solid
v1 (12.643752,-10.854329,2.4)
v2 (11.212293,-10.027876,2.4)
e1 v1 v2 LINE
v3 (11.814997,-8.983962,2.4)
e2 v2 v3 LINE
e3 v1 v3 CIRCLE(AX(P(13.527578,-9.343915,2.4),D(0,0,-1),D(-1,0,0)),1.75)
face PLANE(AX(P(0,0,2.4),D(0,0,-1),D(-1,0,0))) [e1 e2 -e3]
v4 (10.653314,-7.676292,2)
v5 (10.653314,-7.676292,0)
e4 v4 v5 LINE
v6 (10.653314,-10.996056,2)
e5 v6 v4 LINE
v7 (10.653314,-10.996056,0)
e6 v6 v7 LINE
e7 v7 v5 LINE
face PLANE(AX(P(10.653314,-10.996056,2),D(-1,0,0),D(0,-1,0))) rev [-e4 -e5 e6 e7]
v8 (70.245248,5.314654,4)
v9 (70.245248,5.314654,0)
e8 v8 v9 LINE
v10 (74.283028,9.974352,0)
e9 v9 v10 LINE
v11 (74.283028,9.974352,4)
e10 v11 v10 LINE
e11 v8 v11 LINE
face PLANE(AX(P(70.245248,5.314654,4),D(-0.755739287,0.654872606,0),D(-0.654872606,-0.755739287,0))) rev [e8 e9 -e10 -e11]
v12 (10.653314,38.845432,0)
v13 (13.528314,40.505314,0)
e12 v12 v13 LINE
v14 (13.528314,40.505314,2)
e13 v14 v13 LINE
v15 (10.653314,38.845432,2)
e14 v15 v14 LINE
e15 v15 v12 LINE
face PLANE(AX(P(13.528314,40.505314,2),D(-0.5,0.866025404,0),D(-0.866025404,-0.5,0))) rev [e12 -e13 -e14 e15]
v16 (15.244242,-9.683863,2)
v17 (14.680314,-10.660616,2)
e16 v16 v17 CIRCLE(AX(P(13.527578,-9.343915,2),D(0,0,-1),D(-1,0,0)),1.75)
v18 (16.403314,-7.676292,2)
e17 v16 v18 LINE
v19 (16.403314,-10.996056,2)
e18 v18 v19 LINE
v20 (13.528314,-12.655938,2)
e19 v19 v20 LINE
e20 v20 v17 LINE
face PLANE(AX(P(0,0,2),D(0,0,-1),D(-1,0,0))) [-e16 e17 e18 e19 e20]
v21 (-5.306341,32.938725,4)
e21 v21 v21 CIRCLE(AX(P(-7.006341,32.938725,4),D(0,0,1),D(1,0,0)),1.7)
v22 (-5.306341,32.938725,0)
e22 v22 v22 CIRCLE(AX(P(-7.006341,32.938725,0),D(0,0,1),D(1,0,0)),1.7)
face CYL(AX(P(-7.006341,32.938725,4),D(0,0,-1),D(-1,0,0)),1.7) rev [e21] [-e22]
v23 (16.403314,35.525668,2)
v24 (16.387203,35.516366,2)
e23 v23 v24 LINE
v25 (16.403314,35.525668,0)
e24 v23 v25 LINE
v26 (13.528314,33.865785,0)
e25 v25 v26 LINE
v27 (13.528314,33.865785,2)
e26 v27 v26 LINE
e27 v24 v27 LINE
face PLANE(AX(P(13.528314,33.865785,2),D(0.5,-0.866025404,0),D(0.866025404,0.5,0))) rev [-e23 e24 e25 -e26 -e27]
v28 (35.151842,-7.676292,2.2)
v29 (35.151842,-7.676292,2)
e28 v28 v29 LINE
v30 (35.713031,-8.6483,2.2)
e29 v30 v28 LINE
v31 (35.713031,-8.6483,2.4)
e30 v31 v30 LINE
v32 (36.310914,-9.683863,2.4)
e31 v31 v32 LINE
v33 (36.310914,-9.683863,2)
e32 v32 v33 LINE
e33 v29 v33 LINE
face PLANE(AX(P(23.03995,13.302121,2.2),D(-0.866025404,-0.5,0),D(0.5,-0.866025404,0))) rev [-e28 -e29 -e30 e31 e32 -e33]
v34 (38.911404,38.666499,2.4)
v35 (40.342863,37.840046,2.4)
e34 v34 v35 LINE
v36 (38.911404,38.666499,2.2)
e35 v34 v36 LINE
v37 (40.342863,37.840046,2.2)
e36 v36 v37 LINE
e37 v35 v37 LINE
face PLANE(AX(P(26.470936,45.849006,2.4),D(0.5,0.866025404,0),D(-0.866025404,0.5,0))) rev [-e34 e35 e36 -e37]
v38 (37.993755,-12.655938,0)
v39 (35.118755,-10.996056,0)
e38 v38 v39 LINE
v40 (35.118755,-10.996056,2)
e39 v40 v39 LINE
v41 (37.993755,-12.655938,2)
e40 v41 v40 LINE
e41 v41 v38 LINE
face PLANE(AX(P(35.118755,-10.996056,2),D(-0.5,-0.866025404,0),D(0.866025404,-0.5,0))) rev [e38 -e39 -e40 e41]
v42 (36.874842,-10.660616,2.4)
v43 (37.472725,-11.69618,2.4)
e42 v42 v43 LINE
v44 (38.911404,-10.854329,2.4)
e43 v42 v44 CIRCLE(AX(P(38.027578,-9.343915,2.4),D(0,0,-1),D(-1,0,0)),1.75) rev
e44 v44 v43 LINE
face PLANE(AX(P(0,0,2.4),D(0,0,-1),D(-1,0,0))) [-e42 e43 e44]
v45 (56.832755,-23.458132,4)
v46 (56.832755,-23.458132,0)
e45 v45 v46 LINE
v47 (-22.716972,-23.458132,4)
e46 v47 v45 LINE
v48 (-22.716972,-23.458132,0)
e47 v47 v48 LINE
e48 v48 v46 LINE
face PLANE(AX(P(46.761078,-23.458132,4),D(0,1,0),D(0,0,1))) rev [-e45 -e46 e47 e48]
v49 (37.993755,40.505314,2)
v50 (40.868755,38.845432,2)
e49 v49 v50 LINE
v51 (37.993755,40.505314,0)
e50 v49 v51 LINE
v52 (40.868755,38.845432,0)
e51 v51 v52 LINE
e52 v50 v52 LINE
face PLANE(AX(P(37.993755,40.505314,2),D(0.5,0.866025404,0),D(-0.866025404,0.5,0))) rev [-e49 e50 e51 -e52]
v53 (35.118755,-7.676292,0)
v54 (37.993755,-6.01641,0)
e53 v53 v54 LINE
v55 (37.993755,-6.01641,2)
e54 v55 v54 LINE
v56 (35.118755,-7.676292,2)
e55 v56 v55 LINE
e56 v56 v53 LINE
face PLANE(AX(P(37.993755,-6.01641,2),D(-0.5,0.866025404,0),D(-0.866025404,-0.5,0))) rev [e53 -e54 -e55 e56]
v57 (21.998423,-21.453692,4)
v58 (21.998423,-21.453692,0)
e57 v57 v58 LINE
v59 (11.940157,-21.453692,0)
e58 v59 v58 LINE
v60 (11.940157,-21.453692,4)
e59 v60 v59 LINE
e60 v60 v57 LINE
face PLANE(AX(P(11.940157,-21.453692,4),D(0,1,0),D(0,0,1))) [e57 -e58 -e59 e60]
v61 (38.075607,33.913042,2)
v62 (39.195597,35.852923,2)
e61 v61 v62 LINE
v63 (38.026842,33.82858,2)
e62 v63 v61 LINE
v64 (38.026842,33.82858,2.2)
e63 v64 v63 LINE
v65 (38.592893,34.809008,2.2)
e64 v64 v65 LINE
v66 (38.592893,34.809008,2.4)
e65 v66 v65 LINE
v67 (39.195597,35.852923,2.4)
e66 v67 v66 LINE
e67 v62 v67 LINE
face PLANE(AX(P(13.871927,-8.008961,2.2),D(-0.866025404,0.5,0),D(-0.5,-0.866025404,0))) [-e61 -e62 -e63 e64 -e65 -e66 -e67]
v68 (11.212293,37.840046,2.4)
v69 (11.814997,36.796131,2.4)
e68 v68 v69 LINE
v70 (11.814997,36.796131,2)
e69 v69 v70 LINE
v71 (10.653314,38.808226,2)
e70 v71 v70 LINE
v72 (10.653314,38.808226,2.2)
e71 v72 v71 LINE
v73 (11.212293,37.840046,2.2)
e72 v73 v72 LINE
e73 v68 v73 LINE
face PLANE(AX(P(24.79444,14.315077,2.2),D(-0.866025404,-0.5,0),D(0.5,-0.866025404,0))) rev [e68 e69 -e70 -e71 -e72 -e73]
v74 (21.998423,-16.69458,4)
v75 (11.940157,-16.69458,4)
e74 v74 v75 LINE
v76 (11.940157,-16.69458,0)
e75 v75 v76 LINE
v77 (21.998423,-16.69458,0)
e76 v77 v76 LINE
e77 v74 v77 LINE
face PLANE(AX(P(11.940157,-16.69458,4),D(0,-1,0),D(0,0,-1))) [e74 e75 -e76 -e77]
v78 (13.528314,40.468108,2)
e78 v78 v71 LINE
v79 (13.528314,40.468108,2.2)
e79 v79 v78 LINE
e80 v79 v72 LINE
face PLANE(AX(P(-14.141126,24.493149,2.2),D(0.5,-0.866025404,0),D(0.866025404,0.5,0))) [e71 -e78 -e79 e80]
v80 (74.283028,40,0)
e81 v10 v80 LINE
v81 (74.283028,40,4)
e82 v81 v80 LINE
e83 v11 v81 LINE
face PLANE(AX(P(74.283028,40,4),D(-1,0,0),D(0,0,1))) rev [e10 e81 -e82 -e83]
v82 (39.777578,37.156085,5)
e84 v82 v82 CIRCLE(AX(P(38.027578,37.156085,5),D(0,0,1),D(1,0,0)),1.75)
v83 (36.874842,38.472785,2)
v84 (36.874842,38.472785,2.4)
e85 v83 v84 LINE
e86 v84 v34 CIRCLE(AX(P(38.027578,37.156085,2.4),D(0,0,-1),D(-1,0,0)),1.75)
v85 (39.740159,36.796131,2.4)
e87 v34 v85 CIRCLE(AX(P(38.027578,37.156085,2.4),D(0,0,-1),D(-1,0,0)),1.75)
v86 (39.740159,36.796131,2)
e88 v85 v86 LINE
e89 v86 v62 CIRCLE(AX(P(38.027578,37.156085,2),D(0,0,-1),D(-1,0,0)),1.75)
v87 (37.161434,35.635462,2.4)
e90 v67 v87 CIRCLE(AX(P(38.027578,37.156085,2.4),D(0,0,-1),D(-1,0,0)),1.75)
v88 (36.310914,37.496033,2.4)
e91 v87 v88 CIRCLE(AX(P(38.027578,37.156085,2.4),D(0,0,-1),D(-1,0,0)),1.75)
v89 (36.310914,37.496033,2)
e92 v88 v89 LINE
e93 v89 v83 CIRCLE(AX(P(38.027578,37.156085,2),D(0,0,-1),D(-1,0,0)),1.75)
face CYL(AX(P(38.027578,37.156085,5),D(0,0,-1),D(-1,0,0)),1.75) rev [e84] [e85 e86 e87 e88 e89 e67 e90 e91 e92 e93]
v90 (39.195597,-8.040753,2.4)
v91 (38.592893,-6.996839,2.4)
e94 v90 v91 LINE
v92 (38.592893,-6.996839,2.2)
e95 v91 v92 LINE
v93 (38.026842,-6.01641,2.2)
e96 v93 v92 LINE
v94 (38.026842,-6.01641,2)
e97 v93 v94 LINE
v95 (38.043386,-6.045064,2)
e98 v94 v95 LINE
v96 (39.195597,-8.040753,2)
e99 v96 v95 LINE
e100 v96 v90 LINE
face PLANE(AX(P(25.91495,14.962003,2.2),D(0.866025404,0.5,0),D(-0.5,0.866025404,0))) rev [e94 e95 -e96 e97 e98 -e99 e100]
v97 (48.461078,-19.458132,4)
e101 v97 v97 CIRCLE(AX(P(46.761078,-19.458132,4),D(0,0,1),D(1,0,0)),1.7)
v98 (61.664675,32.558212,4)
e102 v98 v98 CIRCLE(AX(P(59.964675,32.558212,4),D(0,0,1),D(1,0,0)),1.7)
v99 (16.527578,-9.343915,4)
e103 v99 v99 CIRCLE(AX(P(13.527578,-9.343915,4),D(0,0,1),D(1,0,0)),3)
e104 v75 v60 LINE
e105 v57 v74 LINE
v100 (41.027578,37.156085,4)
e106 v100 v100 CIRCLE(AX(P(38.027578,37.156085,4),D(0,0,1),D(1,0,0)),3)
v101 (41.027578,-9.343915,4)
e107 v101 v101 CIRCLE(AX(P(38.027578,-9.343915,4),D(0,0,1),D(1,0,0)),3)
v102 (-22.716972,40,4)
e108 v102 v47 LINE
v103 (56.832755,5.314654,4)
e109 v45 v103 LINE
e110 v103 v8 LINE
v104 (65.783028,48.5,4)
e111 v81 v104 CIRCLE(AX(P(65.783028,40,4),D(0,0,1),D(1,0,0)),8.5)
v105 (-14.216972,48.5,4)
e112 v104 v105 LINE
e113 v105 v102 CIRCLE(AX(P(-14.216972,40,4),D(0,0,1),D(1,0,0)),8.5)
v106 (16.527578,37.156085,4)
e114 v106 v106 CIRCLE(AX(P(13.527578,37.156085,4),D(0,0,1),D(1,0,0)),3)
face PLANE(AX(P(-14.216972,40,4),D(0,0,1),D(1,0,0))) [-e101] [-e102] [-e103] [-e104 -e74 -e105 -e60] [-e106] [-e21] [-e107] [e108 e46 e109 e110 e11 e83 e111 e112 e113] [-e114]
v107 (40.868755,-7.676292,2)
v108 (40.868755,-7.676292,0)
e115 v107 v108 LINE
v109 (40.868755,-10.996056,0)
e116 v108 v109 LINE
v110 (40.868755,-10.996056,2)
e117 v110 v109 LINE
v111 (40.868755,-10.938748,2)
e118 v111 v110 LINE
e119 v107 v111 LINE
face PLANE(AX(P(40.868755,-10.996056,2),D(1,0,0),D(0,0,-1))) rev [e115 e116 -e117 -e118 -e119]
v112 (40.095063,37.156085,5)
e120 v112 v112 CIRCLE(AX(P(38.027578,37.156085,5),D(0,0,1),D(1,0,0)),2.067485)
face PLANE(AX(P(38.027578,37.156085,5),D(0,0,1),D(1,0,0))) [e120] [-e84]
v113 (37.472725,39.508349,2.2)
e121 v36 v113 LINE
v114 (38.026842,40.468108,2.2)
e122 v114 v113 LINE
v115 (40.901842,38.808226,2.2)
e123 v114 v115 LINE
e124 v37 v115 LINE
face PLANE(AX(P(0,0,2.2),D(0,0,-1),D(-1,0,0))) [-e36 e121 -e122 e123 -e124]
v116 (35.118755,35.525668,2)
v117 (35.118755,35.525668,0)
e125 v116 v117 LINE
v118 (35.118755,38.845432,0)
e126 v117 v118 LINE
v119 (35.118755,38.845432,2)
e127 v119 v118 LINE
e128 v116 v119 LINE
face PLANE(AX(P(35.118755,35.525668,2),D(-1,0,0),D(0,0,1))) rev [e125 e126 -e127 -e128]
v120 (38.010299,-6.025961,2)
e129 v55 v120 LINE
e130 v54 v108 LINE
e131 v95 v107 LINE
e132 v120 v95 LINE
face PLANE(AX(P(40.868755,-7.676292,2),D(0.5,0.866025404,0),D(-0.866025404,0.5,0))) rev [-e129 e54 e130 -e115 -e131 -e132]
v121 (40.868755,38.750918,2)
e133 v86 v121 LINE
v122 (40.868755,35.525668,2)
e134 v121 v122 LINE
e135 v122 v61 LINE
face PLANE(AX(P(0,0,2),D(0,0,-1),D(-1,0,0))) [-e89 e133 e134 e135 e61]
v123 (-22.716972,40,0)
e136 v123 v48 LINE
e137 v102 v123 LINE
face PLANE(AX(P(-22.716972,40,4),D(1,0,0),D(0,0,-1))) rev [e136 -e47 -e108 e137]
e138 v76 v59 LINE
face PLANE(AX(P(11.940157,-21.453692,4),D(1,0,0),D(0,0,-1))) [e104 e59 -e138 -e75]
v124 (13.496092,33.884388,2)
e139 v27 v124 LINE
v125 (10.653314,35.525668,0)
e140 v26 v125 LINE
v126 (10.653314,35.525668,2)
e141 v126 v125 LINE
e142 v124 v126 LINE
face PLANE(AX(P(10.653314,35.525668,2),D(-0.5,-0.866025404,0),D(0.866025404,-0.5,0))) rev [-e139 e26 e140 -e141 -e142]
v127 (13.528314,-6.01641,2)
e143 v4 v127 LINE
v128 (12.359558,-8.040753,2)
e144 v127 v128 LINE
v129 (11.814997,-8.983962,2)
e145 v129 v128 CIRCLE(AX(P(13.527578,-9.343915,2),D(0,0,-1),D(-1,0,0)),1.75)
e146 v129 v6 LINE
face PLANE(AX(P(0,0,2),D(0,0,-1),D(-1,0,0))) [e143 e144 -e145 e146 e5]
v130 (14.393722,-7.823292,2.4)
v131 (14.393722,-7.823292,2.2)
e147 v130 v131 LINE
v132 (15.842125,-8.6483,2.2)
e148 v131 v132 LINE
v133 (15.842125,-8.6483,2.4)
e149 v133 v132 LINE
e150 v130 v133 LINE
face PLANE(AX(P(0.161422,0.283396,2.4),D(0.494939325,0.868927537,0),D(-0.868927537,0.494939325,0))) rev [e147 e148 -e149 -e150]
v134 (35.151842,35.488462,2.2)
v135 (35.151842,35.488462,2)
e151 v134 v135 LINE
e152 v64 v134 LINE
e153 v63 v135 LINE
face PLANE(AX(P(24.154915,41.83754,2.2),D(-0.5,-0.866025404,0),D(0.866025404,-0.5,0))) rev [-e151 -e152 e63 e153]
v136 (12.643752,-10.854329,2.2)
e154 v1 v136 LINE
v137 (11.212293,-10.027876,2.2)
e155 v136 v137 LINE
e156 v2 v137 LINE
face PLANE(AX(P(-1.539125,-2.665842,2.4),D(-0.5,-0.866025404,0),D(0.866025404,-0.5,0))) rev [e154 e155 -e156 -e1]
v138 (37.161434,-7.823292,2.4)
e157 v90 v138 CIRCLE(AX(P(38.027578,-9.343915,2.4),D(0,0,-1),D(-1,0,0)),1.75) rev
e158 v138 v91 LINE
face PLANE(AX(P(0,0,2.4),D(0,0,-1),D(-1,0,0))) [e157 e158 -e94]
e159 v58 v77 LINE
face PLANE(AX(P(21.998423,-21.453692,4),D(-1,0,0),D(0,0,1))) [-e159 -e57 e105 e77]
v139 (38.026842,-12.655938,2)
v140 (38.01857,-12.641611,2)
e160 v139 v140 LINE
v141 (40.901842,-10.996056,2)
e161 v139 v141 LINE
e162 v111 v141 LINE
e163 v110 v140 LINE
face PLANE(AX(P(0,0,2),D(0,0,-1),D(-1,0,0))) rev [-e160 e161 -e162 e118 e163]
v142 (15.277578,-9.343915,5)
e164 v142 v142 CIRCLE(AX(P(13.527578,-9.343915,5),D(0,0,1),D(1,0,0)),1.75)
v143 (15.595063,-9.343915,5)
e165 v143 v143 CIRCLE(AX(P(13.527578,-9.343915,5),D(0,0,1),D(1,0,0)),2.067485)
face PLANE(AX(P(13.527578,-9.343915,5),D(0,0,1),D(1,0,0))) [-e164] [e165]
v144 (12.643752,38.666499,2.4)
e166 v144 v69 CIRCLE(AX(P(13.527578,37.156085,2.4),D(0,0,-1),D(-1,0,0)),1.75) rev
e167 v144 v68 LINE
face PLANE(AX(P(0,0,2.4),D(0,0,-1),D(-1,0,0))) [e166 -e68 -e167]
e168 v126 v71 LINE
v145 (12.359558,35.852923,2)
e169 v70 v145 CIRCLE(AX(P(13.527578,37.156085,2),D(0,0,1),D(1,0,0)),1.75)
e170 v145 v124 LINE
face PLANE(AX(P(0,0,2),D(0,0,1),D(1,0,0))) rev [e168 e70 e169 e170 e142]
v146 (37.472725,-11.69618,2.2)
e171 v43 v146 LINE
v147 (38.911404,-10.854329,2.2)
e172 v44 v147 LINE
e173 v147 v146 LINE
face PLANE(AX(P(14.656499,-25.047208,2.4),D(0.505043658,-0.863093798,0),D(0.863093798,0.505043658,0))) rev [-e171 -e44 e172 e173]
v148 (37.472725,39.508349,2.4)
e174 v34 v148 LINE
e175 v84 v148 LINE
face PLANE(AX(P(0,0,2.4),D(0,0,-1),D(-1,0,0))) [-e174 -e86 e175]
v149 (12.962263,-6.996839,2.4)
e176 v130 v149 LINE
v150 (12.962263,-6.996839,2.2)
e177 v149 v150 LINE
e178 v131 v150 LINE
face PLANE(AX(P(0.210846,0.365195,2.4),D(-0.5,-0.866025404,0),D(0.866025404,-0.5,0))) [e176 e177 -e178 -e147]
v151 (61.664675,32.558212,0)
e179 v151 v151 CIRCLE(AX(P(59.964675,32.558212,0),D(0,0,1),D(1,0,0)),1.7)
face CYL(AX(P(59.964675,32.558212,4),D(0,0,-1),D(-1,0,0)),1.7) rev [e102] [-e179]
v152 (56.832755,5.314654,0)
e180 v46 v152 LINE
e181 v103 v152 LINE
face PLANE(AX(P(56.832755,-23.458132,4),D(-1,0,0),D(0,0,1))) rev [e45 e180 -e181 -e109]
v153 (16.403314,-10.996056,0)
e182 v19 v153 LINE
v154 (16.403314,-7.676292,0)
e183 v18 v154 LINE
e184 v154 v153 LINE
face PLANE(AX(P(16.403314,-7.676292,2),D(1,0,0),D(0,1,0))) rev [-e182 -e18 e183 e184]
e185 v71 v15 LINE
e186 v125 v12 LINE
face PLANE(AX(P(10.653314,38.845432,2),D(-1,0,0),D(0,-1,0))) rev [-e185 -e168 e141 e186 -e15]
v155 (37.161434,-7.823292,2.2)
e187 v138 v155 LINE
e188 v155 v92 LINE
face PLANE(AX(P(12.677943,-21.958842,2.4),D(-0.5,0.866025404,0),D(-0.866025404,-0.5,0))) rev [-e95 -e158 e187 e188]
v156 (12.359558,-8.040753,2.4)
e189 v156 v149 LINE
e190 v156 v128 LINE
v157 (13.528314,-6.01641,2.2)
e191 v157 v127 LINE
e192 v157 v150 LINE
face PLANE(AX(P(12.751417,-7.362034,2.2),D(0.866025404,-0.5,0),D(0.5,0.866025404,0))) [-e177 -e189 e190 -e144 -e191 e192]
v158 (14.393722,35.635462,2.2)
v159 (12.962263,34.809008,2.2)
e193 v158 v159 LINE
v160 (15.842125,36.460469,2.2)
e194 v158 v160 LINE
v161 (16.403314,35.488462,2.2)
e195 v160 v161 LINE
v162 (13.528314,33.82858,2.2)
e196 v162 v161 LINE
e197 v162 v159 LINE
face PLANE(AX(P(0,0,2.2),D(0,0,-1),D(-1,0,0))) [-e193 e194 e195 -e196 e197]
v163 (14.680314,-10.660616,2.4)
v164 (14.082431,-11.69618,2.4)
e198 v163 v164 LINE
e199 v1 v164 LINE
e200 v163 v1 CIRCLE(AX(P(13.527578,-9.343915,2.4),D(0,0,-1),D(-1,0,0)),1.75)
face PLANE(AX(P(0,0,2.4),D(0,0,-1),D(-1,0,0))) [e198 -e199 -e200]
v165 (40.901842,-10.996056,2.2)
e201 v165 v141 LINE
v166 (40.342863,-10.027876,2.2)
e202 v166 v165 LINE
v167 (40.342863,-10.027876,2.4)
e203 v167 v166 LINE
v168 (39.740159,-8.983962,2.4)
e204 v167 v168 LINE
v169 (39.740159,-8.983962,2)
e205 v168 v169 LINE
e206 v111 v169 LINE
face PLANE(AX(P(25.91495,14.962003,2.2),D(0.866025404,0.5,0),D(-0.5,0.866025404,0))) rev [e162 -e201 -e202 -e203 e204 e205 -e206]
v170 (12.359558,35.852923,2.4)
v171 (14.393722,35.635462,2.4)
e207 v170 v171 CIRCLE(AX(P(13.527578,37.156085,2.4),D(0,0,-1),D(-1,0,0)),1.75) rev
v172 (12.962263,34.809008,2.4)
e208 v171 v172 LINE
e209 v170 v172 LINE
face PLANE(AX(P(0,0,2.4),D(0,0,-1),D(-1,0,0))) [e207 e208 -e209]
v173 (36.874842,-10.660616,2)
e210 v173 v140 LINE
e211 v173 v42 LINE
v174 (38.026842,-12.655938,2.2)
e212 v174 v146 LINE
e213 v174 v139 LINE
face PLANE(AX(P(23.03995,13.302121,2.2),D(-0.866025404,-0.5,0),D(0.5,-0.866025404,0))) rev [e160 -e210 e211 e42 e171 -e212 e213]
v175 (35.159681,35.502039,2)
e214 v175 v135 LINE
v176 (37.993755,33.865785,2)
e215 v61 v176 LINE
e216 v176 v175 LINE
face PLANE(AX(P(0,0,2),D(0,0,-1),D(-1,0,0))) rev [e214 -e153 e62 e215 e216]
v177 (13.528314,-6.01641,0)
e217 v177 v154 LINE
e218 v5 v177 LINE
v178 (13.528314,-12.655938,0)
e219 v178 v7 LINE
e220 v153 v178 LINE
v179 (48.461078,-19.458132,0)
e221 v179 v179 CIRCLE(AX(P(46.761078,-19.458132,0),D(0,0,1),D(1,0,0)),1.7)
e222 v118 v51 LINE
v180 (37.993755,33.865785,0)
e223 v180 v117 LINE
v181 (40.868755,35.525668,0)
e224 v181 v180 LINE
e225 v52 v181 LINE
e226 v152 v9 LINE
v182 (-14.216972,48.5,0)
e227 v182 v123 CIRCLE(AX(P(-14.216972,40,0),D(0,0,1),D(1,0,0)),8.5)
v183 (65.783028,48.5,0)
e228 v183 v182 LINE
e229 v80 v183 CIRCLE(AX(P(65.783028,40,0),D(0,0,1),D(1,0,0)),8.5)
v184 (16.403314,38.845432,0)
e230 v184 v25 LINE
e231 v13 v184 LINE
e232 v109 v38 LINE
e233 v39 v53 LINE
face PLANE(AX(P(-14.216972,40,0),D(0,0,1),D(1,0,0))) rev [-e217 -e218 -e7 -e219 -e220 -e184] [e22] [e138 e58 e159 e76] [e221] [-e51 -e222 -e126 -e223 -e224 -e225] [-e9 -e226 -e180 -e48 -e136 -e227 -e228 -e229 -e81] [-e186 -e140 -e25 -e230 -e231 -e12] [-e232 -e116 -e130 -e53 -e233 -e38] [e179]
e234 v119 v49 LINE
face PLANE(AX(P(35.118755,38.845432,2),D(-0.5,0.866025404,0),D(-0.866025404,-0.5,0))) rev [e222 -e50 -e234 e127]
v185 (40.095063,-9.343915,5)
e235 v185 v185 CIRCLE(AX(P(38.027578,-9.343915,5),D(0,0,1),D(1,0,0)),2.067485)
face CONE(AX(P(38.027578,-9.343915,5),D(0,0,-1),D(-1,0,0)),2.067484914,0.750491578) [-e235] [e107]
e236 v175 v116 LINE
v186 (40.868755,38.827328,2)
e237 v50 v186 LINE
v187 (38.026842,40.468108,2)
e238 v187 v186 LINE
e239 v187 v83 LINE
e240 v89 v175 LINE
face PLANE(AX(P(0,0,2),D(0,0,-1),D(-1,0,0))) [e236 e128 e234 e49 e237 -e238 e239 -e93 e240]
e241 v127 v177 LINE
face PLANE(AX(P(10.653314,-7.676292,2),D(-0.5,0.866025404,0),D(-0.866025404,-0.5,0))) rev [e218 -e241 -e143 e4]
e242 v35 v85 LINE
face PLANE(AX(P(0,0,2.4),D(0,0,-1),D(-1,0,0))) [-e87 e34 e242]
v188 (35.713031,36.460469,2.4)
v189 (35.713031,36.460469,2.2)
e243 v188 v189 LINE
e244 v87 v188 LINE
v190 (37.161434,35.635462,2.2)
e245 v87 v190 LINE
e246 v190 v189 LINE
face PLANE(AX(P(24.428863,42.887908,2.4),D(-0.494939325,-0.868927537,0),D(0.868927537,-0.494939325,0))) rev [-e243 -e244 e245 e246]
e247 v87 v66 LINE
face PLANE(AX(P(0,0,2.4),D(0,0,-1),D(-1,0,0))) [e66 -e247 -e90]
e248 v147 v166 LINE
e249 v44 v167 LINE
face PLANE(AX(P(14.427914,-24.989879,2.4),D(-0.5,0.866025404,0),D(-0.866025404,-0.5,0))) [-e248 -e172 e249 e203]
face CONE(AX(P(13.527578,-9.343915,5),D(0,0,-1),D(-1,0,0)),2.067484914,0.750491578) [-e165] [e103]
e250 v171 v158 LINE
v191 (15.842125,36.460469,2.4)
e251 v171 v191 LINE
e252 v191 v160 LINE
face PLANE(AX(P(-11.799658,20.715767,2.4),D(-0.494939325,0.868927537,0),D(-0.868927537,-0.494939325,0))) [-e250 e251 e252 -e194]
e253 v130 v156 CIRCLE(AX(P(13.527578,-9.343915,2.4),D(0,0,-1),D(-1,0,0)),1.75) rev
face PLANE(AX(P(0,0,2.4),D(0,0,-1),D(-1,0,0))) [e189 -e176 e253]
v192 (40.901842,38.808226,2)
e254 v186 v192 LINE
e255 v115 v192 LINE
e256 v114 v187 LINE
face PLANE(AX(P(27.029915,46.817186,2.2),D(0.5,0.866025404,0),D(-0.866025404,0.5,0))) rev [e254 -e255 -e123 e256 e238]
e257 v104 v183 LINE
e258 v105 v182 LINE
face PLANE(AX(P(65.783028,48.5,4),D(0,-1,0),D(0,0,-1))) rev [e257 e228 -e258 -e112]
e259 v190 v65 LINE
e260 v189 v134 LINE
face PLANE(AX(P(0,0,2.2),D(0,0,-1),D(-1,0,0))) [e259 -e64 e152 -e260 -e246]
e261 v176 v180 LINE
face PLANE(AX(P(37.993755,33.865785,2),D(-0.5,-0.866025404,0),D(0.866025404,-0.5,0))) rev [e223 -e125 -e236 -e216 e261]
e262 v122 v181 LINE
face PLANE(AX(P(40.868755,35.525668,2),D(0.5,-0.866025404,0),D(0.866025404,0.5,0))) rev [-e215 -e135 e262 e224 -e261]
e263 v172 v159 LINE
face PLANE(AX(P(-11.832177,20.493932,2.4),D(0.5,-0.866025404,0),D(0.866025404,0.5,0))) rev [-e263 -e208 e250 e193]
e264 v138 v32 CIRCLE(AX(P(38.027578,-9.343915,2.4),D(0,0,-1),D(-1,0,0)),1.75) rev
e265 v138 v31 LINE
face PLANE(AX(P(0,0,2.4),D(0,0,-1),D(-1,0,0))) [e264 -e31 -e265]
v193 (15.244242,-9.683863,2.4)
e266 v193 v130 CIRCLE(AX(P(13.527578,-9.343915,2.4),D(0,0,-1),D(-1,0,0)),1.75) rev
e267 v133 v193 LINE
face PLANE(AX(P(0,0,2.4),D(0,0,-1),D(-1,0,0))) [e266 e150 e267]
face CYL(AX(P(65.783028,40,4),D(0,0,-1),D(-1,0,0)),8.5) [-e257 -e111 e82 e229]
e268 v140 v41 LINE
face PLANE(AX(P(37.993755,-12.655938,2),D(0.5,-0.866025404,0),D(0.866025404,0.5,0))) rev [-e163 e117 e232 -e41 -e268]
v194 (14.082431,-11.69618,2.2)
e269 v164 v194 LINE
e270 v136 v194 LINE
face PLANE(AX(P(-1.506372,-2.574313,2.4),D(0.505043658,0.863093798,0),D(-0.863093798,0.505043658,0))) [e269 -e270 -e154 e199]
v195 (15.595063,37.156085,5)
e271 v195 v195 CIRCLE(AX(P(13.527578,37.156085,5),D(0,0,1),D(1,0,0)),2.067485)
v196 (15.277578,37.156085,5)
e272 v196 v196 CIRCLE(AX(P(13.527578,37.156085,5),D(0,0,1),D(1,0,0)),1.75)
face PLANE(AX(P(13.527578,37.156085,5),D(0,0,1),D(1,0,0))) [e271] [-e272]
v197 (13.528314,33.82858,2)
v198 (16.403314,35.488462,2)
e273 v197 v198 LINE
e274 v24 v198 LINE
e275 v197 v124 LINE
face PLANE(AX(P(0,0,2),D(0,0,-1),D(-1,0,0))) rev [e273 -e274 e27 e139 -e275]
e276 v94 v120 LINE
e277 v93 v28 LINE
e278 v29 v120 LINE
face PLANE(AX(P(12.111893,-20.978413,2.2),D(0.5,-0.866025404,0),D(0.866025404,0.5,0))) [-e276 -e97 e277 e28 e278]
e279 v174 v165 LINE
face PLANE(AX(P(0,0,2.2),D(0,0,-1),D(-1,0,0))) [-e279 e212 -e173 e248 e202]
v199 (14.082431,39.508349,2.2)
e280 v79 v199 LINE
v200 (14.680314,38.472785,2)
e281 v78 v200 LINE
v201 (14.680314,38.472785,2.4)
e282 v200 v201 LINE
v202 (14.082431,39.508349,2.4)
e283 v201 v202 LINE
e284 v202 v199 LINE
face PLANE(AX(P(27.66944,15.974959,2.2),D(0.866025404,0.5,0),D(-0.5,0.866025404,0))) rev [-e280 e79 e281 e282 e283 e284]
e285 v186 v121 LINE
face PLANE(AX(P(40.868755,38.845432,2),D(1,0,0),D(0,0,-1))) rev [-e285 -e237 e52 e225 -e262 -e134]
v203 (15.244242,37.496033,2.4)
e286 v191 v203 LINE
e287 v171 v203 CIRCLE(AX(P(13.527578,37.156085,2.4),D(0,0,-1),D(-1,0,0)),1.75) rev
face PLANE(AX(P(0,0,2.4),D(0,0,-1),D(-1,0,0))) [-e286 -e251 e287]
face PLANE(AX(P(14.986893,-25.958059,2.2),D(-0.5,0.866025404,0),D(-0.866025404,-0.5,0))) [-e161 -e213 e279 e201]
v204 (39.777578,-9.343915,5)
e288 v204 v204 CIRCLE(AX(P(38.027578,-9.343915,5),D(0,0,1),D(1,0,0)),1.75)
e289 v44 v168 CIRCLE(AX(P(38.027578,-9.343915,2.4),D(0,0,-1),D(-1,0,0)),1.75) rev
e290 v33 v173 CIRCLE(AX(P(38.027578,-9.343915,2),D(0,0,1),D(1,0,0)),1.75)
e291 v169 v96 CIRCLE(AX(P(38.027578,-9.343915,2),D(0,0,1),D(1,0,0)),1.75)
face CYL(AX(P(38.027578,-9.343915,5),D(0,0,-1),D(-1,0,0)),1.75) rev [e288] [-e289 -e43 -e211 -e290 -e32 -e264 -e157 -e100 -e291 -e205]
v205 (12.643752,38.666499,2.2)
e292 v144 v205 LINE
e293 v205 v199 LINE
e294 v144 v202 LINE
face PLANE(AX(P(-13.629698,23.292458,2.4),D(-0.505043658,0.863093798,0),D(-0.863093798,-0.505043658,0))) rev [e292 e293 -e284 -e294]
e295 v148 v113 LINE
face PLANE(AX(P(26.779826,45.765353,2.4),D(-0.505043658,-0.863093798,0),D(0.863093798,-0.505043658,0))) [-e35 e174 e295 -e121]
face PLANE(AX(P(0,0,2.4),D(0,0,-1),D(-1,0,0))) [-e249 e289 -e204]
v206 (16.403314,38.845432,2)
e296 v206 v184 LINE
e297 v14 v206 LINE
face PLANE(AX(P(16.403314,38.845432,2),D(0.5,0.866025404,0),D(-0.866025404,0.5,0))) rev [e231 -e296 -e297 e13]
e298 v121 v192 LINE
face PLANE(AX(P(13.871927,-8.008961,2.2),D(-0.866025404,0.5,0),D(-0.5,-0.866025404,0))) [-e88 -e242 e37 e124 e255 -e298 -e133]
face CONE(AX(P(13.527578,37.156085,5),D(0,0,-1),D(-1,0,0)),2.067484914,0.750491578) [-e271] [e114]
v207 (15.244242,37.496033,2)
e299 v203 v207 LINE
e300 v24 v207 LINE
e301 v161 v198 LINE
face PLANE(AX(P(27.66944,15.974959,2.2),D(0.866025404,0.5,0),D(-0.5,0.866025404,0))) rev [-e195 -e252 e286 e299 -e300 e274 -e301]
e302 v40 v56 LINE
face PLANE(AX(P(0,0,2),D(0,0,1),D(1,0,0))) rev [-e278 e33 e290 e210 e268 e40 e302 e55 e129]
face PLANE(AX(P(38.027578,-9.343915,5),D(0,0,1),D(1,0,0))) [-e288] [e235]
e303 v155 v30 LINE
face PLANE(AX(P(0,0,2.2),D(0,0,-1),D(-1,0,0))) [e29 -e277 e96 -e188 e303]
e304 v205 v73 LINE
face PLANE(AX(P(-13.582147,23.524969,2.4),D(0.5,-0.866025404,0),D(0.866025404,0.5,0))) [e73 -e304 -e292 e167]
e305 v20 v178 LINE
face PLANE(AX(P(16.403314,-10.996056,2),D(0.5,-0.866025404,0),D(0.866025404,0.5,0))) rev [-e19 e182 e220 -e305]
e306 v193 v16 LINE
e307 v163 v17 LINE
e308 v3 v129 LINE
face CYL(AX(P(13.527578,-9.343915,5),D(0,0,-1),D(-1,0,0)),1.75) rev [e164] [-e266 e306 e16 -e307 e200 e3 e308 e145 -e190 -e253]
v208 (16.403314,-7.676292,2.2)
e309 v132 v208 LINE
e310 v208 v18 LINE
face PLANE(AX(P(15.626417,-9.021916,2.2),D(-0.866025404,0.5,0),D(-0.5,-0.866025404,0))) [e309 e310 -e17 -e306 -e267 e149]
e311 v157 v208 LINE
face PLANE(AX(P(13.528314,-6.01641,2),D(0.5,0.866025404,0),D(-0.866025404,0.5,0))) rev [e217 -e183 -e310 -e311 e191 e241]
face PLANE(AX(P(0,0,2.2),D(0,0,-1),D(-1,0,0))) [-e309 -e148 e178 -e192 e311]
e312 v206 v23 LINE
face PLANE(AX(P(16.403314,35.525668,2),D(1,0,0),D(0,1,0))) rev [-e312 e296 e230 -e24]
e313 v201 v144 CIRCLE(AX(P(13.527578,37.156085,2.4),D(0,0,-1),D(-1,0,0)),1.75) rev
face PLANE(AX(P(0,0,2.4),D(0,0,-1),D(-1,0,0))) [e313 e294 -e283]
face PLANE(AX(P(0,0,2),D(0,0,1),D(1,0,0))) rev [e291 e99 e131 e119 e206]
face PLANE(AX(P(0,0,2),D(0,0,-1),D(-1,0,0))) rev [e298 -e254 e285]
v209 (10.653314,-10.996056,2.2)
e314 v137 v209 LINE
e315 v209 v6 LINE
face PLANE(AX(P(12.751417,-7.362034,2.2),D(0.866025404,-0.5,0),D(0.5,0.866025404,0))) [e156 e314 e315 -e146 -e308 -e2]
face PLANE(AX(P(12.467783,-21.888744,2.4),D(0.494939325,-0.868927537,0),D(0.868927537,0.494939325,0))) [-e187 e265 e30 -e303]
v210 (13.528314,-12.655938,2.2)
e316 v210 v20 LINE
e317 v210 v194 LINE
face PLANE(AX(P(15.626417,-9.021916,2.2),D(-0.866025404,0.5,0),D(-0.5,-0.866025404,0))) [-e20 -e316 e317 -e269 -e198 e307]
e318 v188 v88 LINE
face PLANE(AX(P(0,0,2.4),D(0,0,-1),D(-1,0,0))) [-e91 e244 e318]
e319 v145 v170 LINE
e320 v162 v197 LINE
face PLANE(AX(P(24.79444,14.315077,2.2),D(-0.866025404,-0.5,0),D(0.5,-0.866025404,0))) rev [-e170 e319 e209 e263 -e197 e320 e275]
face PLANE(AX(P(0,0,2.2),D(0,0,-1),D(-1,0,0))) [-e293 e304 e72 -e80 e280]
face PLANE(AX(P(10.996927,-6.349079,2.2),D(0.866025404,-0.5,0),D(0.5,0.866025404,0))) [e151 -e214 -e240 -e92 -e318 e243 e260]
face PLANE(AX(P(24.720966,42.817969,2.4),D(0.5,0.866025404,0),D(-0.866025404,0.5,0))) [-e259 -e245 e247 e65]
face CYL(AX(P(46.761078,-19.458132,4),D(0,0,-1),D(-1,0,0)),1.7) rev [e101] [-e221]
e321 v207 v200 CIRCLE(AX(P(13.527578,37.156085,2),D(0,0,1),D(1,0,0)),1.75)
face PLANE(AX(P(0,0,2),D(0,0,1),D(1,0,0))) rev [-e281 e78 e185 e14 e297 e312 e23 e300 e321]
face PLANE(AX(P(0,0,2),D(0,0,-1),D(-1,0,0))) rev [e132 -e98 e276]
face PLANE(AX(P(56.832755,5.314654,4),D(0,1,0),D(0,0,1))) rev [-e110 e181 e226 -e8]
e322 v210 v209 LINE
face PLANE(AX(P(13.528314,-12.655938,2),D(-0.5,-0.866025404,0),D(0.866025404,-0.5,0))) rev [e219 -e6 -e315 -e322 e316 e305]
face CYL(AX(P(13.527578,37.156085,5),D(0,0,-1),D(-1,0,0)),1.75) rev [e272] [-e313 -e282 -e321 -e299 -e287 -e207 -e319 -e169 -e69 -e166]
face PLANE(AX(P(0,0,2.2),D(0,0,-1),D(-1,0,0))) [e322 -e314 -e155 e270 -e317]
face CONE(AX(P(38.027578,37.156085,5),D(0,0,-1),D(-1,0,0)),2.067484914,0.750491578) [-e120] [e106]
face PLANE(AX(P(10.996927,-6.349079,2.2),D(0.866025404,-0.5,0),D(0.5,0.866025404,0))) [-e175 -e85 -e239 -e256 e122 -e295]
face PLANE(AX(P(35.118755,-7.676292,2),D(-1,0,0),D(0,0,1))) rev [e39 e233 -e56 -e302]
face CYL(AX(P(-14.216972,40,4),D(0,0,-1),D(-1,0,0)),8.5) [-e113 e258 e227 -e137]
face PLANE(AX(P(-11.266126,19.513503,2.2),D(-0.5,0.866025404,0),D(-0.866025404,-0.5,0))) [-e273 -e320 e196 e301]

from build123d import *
from OCP.BRepFilletAPI import BRepFilletAPI_MakeChamfer

# Parameters (mm, degrees)
CROQUIS1_R              = 1.7
CROQUIS1_W              = 10.058265445
CROQUIS1_H              = 4.759112173
SALIENTE_EXTRUIR1_DEPTH = 4
CROQUIS2_R              = 3
CROQUIS2_R_2            = 1.75
SALIENTE_EXTRUIR2_DEPTH = 1
CHAFL_N1_SIZE           = 1
CHAFL_N1_SIZE_2         = 0.932515086
CORTAR_EXTRUIR1_START   = -6
CROQUIS3_R              = 1.75
CORTAR_EXTRUIR1_DEPTH   = 6
CORTAR_EXTRUIR2_DEPTH   = 2
CORTAR_EXTRUIR3_DEPTH   = 0.2
CORTAR_EXTRUIR4_DEPTH   = 0.2


with BuildPart() as part:
    # Croquis1 → Saliente-Extruir1 (new body)
    with BuildSketch(Plane.XY):
        with BuildLine():
            Line((46.761077919, -23.458131852), (56.832754836, -23.458131852))
            Line((56.832754836, -23.458131852), (56.832754836, 5.314653818))
            Line((56.832754836, 5.314653818), (70.245248308, 5.314653818))
            Line((70.245248308, 5.314653818), (74.283027827, 9.974351882))
            Line((74.283027827, 9.974351882), (74.283027827, 40))
            ThreePointArc((74.283027827, 40), (71.793435467, 46.01040764), (65.783027827, 48.5))
            Line((65.783027827, 48.5), (-14.216972173, 48.5))
            ThreePointArc((-14.216972173, 48.5), (-20.227379813, 46.01040764), (-22.716972173, 40))
            Line((-22.716972173, 40), (-22.716972173, -23.458131852))
            Line((-22.716972173, -23.458131852), (46.761077919, -23.458131852))
        make_face()
        with Locations((46.761077919, -19.458131852)):
            Circle(CROQUIS1_R, mode=Mode.SUBTRACT)
        with Locations((-7.00634082, 32.938725209)):
            Circle(CROQUIS1_R, mode=Mode.SUBTRACT)
        with Locations((59.964675143, 32.558212342)):
            Circle(CROQUIS1_R, mode=Mode.SUBTRACT)
        with Locations((16.969290087, -19.074136319)):
            Rectangle(CROQUIS1_W, CROQUIS1_H, mode=Mode.SUBTRACT)
    extrude(amount=SALIENTE_EXTRUIR1_DEPTH)

    # Croquis2 → Saliente-Extruir2 (add)
    # profile 1 of 4: a face of its own
    with BuildSketch(Plane.XY.offset(4)):
        with Locations((13.527577906, 37.15608476)):
            Circle(CROQUIS2_R)
        with Locations((13.527577906, 37.15608476)):
            Circle(CROQUIS2_R_2, mode=Mode.SUBTRACT)
    # profile 2 of 4: a face of its own
    with BuildSketch(Plane.XY.offset(4)):
        with Locations((38.027577906, 37.15608476)):
            Circle(CROQUIS2_R)
        with Locations((38.027577906, 37.15608476)):
            Circle(CROQUIS2_R_2, mode=Mode.SUBTRACT)
    # profile 3 of 4: a face of its own
    with BuildSketch(Plane.XY.offset(4)):
        with Locations((38.027577906, -9.34391524)):
            Circle(CROQUIS2_R)
        with Locations((38.027577906, -9.34391524)):
            Circle(CROQUIS2_R_2, mode=Mode.SUBTRACT)
    # profile 4 of 4: a face of its own
    with BuildSketch(Plane.XY.offset(4)):
        with Locations((13.527577906, -9.34391524)):
            Circle(CROQUIS2_R)
        with Locations((13.527577906, -9.34391524)):
            Circle(CROQUIS2_R_2, mode=Mode.SUBTRACT)
    extrude(amount=SALIENTE_EXTRUIR2_DEPTH)

    # Chaflán1
    chafl_n1_edges_1 = [part.edges().sort_by_distance(p)[0] for p in [
        (10.527577906, 37.15608476, 5),
    ]]
    chafl_n1_side_1 = [part.faces().sort_by_distance(p)[0] for p in [
        (10.527577906, 37.15608476, 4.981349698),
    ]]
    chafl_n1_edges_2 = [part.edges().sort_by_distance(p)[0] for p in [
        (35.027577906, 37.15608476, 5),
    ]]
    chafl_n1_side_2 = [part.faces().sort_by_distance(p)[0] for p in [
        (35.027577906, 37.15608476, 4.981349698),
    ]]
    chafl_n1_edges_3 = [part.edges().sort_by_distance(p)[0] for p in [
        (35.027577906, -9.34391524, 5),
    ]]
    chafl_n1_side_3 = [part.faces().sort_by_distance(p)[0] for p in [
        (35.027577906, -9.34391524, 4.981349698),
    ]]
    chafl_n1_edges_4 = [part.edges().sort_by_distance(p)[0] for p in [
        (10.527577906, -9.34391524, 5),
    ]]
    chafl_n1_side_4 = [part.faces().sort_by_distance(p)[0] for p in [
        (10.527577906, -9.34391524, 4.981349698),
    ]]
    chafl_n1 = BRepFilletAPI_MakeChamfer(part.part.solid().wrapped)
    for e in chafl_n1_edges_1:
        chafl_n1.Add(CHAFL_N1_SIZE - 0.0001, CHAFL_N1_SIZE_2 - 0.0001, e.wrapped, chafl_n1_side_1[0].wrapped)
    for e in chafl_n1_edges_2:
        chafl_n1.Add(CHAFL_N1_SIZE - 0.0001, CHAFL_N1_SIZE_2 - 0.0001, e.wrapped, chafl_n1_side_2[0].wrapped)
    for e in chafl_n1_edges_3:
        chafl_n1.Add(CHAFL_N1_SIZE - 0.0001, CHAFL_N1_SIZE_2 - 0.0001, e.wrapped, chafl_n1_side_3[0].wrapped)
    for e in chafl_n1_edges_4:
        chafl_n1.Add(CHAFL_N1_SIZE - 0.0001, CHAFL_N1_SIZE_2 - 0.0001, e.wrapped, chafl_n1_side_4[0].wrapped)
    add(Compound.cast(chafl_n1.Shape()), mode=Mode.REPLACE)  # a hair under: the kernel refuses the full size

    # Croquis3 → Cortar-Extruir1 (cut)
    with BuildSketch(Plane.XY.offset(4).offset(CORTAR_EXTRUIR1_START)):
        with Locations((13.527577906, -9.34391524)):
            Circle(CROQUIS3_R)
        with Locations((38.027577906, -9.34391524)):
            Circle(CROQUIS3_R)
        with Locations((38.027577906, 37.15608476)):
            Circle(CROQUIS3_R)
        with Locations((13.527577906, 37.15608476)):
            Circle(CROQUIS3_R)
    extrude(amount=CORTAR_EXTRUIR1_DEPTH, mode=Mode.SUBTRACT)

    # Croquis5 → Cortar-Extruir2 (cut)
    with BuildSketch(Plane(origin=(0, 0, 0), x_dir=(-1, 0, 0), z_dir=(0, 0, -1))):
        Polygon((-13.528313647, -12.655938197), (-10.653313647, -10.996056173), (-10.653313647, -7.676292125), (-13.528313647, -6.016410101), (-16.403313647, -7.676292125), (-16.403313647, -10.996056173), align=None)
        Polygon((-40.868755289, -7.676292125), (-37.993755289, -6.016410101), (-35.118755289, -7.676292125), (-35.118755289, -10.996056173), (-37.993755289, -12.655938197), (-40.868755289, -10.996056173), align=None)
        Polygon((-40.868755289, 38.845431555), (-40.868755289, 35.525667507), (-37.993755289, 33.865785483), (-35.118755289, 35.525667507), (-35.118755289, 38.845431555), (-37.993755289, 40.505313579), align=None)
        Polygon((-16.403313647, 35.525667507), (-16.403313647, 38.845431555), (-13.528313647, 40.505313579), (-10.653313647, 38.845431555), (-10.653313647, 35.525667507), (-13.528313647, 33.865785483), align=None)
    extrude(amount=-CORTAR_EXTRUIR2_DEPTH, mode=Mode.SUBTRACT)

    # Croquis6 → Cortar-Extruir3 (cut)
    with BuildSketch(Plane(origin=(0, 0, 2), x_dir=(-1, 0, 0), z_dir=(0, 0, -1))):
        with BuildLine():
            Line((-14.680313514, -10.660615896), (-13.528313647, -12.655938197))
            Line((-13.528313647, -12.655938197), (-10.653313647, -10.996056173))
            Line((-10.653313647, -10.996056173), (-11.814996998, -8.983961587))
            ThreePointArc((-11.814996998, -8.983961587), (-11.786957817, -9.162968548), (-11.777577906, -9.34391524))
            ThreePointArc((-11.777577906, -9.34391524), (-12.804662736, -10.937619622), (-14.680313514, -10.660615896))
        make_face()
        with BuildLine():
            Line((-16.403313647, -7.676292125), (-15.244241928, -9.683863233))
            ThreePointArc((-15.244241928, -9.683863233), (-14.393721726, -7.823292051), (-12.359558444, -8.040753494))
            Line((-12.359558444, -8.040753494), (-13.528313647, -6.016410101))
            Line((-13.528313647, -6.016410101), (-16.403313647, -7.676292125))
        make_face()
        Polygon((-38.026842165, 33.828579621), (-40.901842165, 38.808225692), (-38.026842165, 40.468107716), (-35.151842165, 35.488461645), align=None)
        Polygon((-13.528313647, 40.468107716), (-10.653313647, 38.808225692), (-13.528313647, 33.828579621), (-16.403313647, 35.488461645), align=None)
        Polygon((-38.026842165, -12.655938197), (-40.901842165, -10.996056173), (-38.026842165, -6.016410101), (-35.151842165, -7.676292125), align=None)
    extrude(amount=-CORTAR_EXTRUIR3_DEPTH, mode=Mode.SUBTRACT)

    # Croquis7 → Cortar-Extruir4 (cut)
    with BuildSketch(Plane(origin=(0, 0, 2.2), x_dir=(-1, 0, 0), z_dir=(0, 0, -1))):
        with BuildLine():
            ThreePointArc((-15.244241928, -9.683863233), (-15.11916685, -8.616354498), (-14.393721726, -7.823292051))
            Line((-14.393721726, -7.823292051), (-15.842124921, -8.648299511))
            Line((-15.842124921, -8.648299511), (-15.244241928, -9.683863233))
        make_face()
        with BuildLine():
            Line((-12.962262832, -6.996838873), (-14.393721726, -7.823292051))
            ThreePointArc((-14.393721726, -7.823292051), (-13.341554801, -7.603830356), (-12.359558444, -8.040753494))
            Line((-12.359558444, -8.040753494), (-12.962262832, -6.996838873))
        make_face()
        with BuildLine():
            ThreePointArc((-11.814996998, -8.983961587), (-11.927608639, -10.052856947), (-12.643751504, -10.854329386))
            Line((-12.643751504, -10.854329386), (-11.21229261, -10.027876208))
            Line((-11.21229261, -10.027876208), (-11.814996998, -8.983961587))
        make_face()
        with BuildLine():
            Line((-14.082430521, -11.696179618), (-12.643751504, -10.854329386))
            ThreePointArc((-12.643751504, -10.854329386), (-13.693286293, -11.086052069), (-14.680313514, -10.660615896))
            Line((-14.680313514, -10.660615896), (-14.082430521, -11.696179618))
        make_face()
        with BuildLine():
            ThreePointArc((-39.195597368, -8.040753494), (-38.213601012, -7.603830356), (-37.161434087, -7.823292051))
            Line((-37.161434087, -7.823292051), (-38.592892981, -6.996838873))
            Line((-38.592892981, -6.996838873), (-39.195597368, -8.040753494))
        make_face()
        with BuildLine():
            Line((-36.310913885, -9.683863233), (-35.713030891, -8.648299511))
            Line((-35.713030891, -8.648299511), (-37.161434087, -7.823292051))
            ThreePointArc((-37.161434087, -7.823292051), (-36.435988962, -8.616354498), (-36.310913885, -9.683863233))
        make_face()
        with BuildLine():
            Line((-37.472725291, -11.696179618), (-36.874842298, -10.660615896))
            ThreePointArc((-36.874842298, -10.660615896), (-37.86186952, -11.086052069), (-38.911404308, -10.854329386))
            Line((-38.911404308, -10.854329386), (-37.472725291, -11.696179618))
        make_face()
        with BuildLine():
            Line((-40.342863202, -10.027876208), (-38.911404308, -10.854329386))
            ThreePointArc((-38.911404308, -10.854329386), (-39.627547173, -10.052856947), (-39.740158814, -8.983961587))
            Line((-39.740158814, -8.983961587), (-40.342863202, -10.027876208))
        make_face()
        with BuildLine():
            ThreePointArc((-39.740158814, 36.796131106), (-39.627547173, 37.865026467), (-38.911404308, 38.666498906))
            Line((-38.911404308, 38.666498906), (-40.342863202, 37.840045728))
            Line((-40.342863202, 37.840045728), (-39.740158814, 36.796131106))
        make_face()
        with BuildLine():
            ThreePointArc((-38.911404308, 38.666498906), (-37.86186952, 38.898221589), (-36.874842298, 38.472785416))
            Line((-36.874842298, 38.472785416), (-37.472725291, 39.508349137))
            Line((-37.472725291, 39.508349137), (-38.911404308, 38.666498906))
        make_face()
        with BuildLine():
            ThreePointArc((-36.310913885, 37.496032752), (-36.435988962, 36.428524018), (-37.161434087, 35.635461571))
            Line((-37.161434087, 35.635461571), (-35.713030891, 36.460469031))
            Line((-35.713030891, 36.460469031), (-36.310913885, 37.496032752))
        make_face()
        with BuildLine():
            ThreePointArc((-37.161434087, 35.635461571), (-38.213601012, 35.415999876), (-39.195597368, 35.852923014))
            Line((-39.195597368, 35.852923014), (-38.592892981, 34.809008393))
            Line((-38.592892981, 34.809008393), (-37.161434087, 35.635461571))
        make_face()
        with BuildLine():
            Line((-11.814996998, 36.796131106), (-11.21229261, 37.840045728))
            Line((-11.21229261, 37.840045728), (-12.643751504, 38.666498906))
            ThreePointArc((-12.643751504, 38.666498906), (-11.927608639, 37.865026467), (-11.814996998, 36.796131106))
        make_face()
        with BuildLine():
            ThreePointArc((-14.680313514, 38.472785416), (-13.693286293, 38.898221589), (-12.643751504, 38.666498906))
            Line((-12.643751504, 38.666498906), (-14.082430521, 39.508349137))
            Line((-14.082430521, 39.508349137), (-14.680313514, 38.472785416))
        make_face()
        with BuildLine():
            Line((-15.842124921, 36.460469031), (-14.393721726, 35.635461571))
            ThreePointArc((-14.393721726, 35.635461571), (-15.11916685, 36.428524018), (-15.244241928, 37.496032752))
            Line((-15.244241928, 37.496032752), (-15.842124921, 36.460469031))
        make_face()
        with BuildLine():
            Line((-12.962262832, 34.809008393), (-12.359558444, 35.852923014))
            ThreePointArc((-12.359558444, 35.852923014), (-13.341554801, 35.415999876), (-14.393721726, 35.635461571))
            Line((-14.393721726, 35.635461571), (-12.962262832, 34.809008393))
        make_face()
    extrude(amount=-CORTAR_EXTRUIR4_DEPTH, mode=Mode.SUBTRACT)


solid = part.part
